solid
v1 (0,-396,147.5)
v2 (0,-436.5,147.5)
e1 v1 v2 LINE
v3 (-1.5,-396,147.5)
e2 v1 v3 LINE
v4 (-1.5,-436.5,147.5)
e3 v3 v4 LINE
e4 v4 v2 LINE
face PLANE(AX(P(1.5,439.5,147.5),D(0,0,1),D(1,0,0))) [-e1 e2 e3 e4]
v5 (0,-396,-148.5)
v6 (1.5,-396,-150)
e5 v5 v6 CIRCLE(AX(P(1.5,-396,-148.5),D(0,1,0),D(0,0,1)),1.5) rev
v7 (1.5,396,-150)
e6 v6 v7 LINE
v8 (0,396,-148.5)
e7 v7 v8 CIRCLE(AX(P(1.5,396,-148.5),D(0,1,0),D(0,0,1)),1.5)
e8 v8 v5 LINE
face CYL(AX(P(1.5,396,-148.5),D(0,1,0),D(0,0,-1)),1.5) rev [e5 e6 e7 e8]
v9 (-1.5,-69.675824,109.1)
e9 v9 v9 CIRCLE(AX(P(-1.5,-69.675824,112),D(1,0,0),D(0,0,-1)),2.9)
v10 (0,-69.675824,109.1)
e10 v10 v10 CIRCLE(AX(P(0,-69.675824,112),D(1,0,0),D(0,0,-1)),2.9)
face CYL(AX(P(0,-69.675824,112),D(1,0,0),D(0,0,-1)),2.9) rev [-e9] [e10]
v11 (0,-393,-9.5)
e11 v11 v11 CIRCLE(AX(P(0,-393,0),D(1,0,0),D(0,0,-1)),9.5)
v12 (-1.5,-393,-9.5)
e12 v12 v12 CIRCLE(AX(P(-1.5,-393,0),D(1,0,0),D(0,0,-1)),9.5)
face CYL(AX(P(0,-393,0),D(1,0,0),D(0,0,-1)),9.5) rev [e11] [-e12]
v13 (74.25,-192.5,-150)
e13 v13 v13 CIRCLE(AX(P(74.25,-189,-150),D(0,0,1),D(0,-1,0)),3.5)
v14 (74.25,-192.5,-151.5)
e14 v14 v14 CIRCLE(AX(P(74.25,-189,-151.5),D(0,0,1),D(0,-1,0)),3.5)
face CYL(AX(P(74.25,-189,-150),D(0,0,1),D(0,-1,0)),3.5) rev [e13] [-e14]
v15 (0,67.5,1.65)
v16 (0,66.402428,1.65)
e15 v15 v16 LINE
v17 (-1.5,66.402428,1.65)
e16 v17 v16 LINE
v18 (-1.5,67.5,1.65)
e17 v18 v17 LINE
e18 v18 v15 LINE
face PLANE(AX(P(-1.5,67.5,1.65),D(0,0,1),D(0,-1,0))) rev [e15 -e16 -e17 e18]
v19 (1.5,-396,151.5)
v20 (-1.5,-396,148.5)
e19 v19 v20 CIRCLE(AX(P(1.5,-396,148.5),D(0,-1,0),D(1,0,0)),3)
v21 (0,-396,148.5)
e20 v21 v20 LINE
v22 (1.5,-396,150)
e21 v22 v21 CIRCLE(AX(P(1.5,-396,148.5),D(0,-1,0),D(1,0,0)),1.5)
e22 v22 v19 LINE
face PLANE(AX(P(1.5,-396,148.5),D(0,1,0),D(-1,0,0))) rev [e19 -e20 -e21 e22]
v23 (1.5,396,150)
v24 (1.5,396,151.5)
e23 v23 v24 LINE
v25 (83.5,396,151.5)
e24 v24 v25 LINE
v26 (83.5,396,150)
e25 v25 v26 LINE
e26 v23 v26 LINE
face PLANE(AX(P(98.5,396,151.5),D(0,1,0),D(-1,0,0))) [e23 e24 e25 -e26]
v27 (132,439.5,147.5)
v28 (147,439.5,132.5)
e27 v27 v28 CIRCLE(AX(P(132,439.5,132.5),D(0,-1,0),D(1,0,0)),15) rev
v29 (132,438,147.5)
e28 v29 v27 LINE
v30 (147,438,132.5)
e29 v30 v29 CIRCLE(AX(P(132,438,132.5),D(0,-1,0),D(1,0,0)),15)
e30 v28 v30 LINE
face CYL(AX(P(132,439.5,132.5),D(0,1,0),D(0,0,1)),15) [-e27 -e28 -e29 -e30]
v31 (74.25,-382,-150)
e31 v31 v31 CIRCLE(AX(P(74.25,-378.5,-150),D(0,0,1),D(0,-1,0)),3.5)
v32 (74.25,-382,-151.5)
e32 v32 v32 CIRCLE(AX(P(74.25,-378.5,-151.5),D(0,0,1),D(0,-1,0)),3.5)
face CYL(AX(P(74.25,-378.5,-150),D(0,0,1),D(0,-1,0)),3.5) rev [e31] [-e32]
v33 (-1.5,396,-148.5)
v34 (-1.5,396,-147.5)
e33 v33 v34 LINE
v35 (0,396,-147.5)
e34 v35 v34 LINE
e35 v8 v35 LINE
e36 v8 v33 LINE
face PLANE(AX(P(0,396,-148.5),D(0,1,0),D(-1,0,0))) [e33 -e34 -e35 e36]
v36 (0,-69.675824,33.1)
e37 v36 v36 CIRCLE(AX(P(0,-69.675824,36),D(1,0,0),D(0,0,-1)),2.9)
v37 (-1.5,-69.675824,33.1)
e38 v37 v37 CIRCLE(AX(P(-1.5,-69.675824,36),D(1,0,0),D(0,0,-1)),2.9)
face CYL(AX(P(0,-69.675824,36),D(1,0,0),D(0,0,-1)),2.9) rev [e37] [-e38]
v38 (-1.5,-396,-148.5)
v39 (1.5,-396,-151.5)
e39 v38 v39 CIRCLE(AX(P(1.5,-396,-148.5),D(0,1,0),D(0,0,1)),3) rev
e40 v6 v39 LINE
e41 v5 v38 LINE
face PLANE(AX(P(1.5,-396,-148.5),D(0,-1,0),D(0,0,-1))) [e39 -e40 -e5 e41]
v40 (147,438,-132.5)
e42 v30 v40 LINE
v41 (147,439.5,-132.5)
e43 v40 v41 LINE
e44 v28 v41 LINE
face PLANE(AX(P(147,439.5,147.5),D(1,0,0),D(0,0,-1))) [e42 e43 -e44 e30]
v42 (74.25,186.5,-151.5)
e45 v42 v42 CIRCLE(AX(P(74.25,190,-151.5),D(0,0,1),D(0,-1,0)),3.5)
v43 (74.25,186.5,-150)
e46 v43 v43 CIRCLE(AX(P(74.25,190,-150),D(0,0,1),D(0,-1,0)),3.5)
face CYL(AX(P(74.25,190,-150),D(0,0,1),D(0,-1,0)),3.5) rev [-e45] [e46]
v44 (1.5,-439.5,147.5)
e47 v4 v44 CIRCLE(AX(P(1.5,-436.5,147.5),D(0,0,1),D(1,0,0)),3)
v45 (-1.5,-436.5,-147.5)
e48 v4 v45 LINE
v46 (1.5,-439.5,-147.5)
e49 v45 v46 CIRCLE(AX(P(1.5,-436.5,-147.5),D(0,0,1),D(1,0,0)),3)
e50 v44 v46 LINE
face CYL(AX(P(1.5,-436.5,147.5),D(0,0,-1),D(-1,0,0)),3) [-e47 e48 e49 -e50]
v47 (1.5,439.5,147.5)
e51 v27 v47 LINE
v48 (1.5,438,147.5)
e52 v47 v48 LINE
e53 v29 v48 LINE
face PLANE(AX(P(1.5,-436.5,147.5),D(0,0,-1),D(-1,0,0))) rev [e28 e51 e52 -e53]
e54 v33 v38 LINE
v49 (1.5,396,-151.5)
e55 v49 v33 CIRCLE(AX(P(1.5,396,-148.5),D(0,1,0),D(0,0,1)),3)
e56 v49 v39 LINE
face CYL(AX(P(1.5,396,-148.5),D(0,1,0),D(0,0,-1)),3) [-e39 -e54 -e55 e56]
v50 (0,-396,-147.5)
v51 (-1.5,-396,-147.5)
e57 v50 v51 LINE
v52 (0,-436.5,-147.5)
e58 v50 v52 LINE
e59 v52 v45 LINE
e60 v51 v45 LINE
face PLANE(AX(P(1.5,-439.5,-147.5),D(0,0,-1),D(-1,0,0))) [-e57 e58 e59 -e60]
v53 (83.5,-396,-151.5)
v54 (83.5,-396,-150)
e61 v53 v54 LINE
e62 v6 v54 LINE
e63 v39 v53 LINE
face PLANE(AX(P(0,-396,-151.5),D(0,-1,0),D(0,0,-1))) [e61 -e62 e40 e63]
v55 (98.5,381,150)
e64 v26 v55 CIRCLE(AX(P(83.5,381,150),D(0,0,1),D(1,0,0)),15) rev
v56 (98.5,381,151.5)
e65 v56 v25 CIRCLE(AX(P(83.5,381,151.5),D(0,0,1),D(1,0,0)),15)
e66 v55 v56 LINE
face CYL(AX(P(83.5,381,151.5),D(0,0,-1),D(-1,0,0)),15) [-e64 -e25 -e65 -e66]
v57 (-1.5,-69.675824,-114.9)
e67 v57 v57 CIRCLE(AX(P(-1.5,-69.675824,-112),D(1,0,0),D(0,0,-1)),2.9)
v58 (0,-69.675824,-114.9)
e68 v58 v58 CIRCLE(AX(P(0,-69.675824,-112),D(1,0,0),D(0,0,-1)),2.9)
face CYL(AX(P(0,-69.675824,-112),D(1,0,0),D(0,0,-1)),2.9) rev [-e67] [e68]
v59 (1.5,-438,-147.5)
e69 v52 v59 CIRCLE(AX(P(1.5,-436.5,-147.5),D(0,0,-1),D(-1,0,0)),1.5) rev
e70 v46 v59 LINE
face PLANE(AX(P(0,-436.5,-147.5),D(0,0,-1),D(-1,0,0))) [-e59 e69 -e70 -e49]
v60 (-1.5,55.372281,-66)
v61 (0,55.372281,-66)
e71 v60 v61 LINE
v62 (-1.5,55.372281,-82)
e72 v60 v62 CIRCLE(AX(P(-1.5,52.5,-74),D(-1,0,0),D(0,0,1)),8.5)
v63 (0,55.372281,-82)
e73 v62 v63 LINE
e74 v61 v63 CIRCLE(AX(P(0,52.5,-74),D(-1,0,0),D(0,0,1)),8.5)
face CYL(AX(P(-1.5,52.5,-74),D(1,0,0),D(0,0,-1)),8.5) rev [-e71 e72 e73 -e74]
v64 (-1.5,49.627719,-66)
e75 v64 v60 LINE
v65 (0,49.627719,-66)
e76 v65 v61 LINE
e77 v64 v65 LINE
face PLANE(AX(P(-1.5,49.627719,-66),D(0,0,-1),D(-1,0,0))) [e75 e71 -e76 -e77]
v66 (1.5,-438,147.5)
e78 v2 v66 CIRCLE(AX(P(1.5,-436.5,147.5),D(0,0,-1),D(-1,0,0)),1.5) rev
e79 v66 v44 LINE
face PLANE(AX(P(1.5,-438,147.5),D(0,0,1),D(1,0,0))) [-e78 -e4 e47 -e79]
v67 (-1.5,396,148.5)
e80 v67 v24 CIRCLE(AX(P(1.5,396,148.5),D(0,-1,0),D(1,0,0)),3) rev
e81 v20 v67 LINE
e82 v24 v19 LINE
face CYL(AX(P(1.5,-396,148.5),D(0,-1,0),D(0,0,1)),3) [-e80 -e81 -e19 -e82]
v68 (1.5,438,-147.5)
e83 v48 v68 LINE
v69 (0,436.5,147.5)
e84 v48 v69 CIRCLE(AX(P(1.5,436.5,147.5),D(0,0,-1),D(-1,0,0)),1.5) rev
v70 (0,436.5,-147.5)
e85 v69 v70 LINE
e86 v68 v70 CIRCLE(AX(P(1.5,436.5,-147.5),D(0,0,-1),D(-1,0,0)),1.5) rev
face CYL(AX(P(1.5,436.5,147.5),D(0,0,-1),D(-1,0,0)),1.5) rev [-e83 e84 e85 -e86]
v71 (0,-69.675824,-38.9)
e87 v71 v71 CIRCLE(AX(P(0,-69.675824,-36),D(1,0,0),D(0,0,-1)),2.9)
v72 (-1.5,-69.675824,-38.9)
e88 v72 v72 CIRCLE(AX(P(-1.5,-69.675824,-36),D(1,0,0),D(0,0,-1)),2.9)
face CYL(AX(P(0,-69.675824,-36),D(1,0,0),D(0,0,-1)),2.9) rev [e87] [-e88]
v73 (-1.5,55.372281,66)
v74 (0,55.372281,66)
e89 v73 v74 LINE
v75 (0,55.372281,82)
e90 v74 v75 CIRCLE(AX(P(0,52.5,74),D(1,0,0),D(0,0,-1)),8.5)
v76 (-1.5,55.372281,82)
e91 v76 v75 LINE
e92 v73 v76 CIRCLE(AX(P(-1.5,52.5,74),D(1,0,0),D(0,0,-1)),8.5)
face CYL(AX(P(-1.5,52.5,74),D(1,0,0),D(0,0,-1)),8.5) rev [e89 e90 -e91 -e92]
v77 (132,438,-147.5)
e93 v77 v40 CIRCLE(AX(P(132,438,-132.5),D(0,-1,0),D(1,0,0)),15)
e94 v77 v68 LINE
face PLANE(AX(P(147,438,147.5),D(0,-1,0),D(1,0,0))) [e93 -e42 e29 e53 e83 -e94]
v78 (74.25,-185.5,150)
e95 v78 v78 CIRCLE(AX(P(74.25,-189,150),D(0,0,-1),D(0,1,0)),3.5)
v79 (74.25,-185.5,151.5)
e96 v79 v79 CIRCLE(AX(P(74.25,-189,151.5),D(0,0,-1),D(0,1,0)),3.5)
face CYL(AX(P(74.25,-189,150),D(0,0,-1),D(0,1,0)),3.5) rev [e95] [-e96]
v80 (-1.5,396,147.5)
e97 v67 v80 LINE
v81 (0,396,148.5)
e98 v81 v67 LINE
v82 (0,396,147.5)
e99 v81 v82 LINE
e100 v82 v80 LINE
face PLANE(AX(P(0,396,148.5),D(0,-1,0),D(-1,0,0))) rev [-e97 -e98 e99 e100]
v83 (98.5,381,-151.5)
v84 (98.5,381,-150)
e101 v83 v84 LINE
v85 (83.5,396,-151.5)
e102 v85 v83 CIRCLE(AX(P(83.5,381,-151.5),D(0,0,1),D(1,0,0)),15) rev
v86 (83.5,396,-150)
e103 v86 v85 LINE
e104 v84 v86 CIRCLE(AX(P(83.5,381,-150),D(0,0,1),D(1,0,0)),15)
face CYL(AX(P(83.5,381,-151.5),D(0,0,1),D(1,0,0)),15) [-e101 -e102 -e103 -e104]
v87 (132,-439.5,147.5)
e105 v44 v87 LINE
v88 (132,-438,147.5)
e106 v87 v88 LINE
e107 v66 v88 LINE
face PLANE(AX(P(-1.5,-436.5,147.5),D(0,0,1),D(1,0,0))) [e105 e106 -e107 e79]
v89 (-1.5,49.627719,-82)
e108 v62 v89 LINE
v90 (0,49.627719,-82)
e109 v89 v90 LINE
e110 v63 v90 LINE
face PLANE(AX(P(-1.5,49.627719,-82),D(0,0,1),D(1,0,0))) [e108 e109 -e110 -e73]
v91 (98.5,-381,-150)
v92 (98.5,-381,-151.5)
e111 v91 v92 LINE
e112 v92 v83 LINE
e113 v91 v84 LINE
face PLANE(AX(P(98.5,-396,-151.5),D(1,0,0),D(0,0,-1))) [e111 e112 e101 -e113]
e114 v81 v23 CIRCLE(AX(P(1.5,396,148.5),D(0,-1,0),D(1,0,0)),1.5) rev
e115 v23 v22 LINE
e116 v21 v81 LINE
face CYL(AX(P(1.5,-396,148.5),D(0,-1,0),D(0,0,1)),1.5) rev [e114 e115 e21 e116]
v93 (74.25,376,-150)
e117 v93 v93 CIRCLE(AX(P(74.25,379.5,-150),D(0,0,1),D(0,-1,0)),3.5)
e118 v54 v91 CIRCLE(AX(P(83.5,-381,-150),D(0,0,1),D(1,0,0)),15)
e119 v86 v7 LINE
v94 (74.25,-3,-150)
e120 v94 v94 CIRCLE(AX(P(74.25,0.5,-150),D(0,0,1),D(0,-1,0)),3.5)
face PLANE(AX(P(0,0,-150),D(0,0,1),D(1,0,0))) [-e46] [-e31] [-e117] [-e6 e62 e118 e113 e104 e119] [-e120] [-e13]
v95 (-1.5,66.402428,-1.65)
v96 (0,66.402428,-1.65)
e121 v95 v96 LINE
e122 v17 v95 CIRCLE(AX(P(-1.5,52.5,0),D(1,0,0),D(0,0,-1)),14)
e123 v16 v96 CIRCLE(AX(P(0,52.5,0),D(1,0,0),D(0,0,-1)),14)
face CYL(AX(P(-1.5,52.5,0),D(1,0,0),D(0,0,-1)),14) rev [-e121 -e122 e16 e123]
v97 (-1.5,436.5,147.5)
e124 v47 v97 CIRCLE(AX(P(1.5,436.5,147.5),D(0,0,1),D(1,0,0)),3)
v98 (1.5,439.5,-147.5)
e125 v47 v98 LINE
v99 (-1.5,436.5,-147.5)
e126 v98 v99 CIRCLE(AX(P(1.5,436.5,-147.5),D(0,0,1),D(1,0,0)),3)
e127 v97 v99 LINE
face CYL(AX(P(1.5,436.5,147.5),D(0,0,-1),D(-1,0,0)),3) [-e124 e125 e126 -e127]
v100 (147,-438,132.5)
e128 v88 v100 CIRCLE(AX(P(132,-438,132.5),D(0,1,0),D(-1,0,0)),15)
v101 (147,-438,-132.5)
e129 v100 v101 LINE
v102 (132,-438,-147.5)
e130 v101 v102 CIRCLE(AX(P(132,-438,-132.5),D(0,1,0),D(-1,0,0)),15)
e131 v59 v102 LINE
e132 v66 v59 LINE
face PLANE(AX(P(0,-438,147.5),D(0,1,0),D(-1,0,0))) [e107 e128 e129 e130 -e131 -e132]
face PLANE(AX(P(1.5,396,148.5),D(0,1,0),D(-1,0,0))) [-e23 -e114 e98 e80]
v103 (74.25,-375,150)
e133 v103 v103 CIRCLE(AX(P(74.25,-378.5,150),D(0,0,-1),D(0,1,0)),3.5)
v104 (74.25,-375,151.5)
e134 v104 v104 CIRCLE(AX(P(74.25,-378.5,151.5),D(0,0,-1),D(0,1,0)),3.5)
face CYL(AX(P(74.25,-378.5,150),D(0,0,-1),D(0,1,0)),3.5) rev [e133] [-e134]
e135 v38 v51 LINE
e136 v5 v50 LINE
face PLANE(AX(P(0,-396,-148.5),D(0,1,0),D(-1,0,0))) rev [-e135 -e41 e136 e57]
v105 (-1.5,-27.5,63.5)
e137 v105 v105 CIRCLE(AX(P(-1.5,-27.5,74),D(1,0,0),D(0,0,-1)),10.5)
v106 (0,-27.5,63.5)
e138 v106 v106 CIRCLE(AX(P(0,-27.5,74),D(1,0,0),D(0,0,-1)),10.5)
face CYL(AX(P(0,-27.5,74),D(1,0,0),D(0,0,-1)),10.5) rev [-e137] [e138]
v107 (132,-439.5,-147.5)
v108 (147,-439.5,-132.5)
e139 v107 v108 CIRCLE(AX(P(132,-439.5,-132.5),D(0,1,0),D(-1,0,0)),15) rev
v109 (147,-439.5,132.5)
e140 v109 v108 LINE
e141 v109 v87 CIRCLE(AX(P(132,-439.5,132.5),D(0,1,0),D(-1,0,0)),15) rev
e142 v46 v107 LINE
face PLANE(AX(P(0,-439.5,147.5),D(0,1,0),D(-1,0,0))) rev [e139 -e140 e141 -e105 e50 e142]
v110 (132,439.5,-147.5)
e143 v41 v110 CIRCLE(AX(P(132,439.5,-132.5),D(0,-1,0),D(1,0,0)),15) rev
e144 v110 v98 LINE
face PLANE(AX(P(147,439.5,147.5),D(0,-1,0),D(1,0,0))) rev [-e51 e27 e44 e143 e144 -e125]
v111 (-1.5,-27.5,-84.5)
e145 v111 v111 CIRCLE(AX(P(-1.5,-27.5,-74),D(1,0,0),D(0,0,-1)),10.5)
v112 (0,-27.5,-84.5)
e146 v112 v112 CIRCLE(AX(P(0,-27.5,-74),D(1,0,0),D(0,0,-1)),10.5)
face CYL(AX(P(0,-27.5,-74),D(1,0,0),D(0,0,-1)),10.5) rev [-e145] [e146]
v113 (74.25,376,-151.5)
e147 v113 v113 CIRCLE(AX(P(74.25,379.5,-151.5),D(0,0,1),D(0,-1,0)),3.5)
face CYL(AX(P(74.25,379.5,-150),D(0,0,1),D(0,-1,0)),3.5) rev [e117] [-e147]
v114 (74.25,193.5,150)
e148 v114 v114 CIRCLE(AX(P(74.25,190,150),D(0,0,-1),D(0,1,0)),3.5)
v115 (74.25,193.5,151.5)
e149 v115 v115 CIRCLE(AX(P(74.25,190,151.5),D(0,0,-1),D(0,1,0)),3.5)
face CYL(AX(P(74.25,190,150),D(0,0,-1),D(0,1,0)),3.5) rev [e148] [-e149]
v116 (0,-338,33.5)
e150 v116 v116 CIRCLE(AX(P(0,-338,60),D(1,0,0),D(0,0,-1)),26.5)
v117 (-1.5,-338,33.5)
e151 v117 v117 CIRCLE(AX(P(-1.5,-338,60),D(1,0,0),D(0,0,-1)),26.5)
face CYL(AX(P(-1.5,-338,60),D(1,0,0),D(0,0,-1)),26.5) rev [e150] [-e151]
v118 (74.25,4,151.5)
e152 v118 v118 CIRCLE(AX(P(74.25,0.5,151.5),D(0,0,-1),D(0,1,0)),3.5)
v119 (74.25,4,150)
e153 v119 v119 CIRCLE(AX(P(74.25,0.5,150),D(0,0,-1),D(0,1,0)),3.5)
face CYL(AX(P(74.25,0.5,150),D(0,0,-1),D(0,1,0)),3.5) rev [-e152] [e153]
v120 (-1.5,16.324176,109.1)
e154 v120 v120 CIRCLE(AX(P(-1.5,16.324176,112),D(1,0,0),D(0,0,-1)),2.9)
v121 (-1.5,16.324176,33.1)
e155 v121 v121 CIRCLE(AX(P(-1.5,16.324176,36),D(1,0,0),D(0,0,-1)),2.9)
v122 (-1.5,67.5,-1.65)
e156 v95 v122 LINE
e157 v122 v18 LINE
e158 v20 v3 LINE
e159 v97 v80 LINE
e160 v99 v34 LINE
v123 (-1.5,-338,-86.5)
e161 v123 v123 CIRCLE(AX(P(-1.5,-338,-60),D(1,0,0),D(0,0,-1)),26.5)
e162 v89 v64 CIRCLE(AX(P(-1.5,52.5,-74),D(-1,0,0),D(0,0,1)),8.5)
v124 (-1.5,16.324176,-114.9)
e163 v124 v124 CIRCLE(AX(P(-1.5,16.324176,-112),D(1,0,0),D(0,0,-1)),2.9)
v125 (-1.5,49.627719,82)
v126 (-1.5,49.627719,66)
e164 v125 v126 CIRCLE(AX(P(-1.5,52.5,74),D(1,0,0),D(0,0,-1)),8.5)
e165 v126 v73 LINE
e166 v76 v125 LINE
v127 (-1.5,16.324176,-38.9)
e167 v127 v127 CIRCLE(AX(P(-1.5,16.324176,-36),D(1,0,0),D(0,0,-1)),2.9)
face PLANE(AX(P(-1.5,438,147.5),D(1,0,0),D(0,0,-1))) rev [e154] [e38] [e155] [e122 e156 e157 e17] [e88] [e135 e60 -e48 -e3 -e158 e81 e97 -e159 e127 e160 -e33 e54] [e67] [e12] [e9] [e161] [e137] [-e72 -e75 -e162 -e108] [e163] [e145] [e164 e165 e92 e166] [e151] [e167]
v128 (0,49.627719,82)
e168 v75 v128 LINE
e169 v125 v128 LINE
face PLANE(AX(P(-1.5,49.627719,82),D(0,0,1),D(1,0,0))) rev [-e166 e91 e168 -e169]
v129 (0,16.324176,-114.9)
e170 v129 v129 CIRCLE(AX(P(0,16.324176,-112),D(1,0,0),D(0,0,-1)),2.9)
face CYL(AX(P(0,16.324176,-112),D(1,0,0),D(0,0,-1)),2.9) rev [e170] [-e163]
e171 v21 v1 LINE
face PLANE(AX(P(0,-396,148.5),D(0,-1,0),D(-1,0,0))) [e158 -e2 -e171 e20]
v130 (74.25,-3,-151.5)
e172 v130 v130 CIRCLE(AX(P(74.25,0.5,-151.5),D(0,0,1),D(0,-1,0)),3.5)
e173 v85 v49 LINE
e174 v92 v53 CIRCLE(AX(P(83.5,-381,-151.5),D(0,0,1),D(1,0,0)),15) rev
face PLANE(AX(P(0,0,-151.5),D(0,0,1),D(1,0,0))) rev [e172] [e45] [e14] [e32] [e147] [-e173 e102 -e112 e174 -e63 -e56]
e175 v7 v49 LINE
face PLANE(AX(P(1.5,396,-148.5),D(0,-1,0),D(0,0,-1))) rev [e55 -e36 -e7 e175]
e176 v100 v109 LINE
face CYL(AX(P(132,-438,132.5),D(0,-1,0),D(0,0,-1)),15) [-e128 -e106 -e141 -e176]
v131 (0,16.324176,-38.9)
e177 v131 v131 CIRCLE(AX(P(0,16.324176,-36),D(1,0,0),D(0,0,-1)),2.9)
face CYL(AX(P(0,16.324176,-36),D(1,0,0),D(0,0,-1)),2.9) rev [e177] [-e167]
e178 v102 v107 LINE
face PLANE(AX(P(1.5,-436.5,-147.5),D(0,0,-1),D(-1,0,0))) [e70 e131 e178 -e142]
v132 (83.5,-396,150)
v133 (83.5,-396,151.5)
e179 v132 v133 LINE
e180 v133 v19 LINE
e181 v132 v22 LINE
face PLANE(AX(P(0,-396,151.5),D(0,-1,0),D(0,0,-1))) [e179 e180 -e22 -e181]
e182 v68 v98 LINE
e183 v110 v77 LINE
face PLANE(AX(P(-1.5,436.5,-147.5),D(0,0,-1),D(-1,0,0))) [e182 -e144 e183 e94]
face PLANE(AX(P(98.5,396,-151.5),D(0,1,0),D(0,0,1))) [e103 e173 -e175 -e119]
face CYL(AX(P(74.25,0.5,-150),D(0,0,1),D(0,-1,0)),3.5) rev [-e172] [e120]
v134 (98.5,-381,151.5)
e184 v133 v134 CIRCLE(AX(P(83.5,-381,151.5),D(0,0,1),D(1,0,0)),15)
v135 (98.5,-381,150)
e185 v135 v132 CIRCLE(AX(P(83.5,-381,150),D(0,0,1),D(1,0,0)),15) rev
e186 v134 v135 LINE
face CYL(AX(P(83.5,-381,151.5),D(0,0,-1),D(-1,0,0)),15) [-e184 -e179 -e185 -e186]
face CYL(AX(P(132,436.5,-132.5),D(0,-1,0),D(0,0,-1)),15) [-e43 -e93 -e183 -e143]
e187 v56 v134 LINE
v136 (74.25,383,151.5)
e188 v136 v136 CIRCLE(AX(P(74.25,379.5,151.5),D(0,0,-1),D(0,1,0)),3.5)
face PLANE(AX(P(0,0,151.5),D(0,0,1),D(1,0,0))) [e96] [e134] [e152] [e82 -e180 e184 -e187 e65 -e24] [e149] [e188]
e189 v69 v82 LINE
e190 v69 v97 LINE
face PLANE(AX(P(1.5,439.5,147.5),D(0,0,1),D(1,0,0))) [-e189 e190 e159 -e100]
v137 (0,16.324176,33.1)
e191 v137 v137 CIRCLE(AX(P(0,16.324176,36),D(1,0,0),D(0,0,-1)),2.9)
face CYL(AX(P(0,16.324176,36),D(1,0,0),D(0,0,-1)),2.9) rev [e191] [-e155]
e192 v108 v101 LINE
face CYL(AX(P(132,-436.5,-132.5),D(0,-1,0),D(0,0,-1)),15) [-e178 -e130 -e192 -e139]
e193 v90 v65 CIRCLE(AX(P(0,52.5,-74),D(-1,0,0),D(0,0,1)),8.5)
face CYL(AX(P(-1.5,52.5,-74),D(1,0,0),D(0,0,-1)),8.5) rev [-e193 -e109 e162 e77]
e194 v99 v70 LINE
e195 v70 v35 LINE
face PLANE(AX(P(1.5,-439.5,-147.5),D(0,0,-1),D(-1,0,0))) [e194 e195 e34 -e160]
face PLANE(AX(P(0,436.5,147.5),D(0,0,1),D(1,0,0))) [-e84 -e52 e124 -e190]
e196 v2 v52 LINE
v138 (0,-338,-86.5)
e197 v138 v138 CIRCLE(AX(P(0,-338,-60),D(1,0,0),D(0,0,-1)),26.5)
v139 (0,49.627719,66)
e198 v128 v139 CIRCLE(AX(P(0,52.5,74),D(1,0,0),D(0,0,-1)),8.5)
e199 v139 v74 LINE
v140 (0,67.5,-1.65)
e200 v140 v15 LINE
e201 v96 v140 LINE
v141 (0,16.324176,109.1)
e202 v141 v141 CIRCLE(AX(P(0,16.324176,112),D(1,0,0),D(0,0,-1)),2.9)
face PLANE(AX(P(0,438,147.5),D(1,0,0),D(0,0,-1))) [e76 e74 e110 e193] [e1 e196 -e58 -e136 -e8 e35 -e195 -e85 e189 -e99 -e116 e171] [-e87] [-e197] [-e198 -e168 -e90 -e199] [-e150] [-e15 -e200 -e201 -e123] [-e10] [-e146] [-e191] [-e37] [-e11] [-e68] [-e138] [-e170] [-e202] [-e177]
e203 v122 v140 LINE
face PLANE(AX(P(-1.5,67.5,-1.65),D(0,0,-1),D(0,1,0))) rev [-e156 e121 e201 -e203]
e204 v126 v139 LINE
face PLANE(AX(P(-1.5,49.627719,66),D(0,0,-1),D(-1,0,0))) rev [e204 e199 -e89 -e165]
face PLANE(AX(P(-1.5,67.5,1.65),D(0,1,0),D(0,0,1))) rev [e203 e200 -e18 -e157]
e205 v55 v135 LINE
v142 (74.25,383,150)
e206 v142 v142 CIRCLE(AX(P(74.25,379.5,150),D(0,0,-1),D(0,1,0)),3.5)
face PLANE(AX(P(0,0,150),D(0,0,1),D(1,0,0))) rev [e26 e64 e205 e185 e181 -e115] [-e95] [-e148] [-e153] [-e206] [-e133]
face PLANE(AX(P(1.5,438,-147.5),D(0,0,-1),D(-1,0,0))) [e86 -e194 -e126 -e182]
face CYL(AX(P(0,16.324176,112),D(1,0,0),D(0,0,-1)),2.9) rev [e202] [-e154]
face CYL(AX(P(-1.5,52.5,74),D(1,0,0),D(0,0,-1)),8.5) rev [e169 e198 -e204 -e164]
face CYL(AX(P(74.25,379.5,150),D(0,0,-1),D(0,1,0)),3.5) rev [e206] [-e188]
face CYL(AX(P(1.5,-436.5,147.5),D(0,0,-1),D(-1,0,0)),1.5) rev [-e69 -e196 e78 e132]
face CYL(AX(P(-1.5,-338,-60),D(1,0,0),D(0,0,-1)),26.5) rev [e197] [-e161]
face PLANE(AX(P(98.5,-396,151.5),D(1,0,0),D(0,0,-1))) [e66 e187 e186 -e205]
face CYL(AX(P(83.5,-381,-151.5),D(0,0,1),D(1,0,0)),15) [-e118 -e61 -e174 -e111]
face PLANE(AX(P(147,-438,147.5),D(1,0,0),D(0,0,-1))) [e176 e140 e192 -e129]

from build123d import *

# Parameters (mm, degrees)
BASE_FLANGE1_DEPTH           = 147.5
EDGE_FLANGE1_DEPTH           = 792
EDGE_FLANGE1_BEND_DEPTH      = 792
F_7_0_7_DIAMETER_HOLE1_D     = 7
F_7_0_7_DIAMETER_HOLE1_DEPTH = 1.5
FILLET1_R                    = 15
SKETCH14_R                   = 26.5
CUT_EXTRUDE1_DEPTH           = 488.566918484
M16_CLEARANCE_HOLE1_D        = 19
M5_CLEARANCE_HOLE1_D         = 5.8
M20_CLEARANCE_HOLE1_D        = 21
CUT_EXTRUDE2_DEPTH           = 488.566918484
CUT_EXTRUDE3_DEPTH           = 488.566918484


# Sheet-metal steps are written as plain solids
with BuildPart() as part:
    # Sketch1 → Base-Flange1 (new, symmetric)
    with BuildSketch(Plane.XY):
        with BuildLine():
            Line((147, 438), (1.5, 438))
            ThreePointArc((1.5, 438), (0.439339828, 437.560660172), (0, 436.5))
            Line((0, 436.5), (0, -436.5))
            ThreePointArc((0, -436.5), (0.439339828, -437.560660172), (1.5, -438))
            Line((1.5, -438), (147, -438))
            Line((147, -438), (147, -439.5))
            Line((147, -439.5), (1.5, -439.5))
            ThreePointArc((1.5, -439.5), (-0.621320344, -438.621320344), (-1.5, -436.5))
            Line((-1.5, -436.5), (-1.5, 436.5))
            ThreePointArc((-1.5, 436.5), (-0.621320344, 438.621320344), (1.5, 439.5))
            Line((1.5, 439.5), (147, 439.5))
            Line((147, 439.5), (147, 438))
        make_face()
    extrude(amount=BASE_FLANGE1_DEPTH, both=True)

    # Edge-Flange1 section (across the edge) → Edge-Flange1 (add)
    with BuildSketch(Plane(origin=(0, 396, 150), x_dir=(0, 0, -1), z_dir=(0, -1, 0))):
        with BuildLine():
            Line((-1.5, 1.5), (-1.5, 98.5))
            Line((-1.5, 98.5), (0, 98.5))
            Line((0, 98.5), (0, 1.5))
            ThreePointArc((0, 1.5), (0.439339828, 0.439339828), (1.5, 0))
            Line((1.5, 0), (2.5, 0))
            Line((2.5, 0), (2.5, -1.5))
            Line((2.5, -1.5), (1.5, -1.5))
            ThreePointArc((1.5, -1.5), (-0.621320344, -0.621320344), (-1.5, 1.5))
        make_face()
    extrude(amount=EDGE_FLANGE1_DEPTH)

    # Edge-Flange1 section 2 (across the edge) → Edge-Flange1 bend (add)
    with BuildSketch(Plane(origin=(0, -396, -150), x_dir=(0, 0, 1), z_dir=(0, 1, 0))):
        with BuildLine():
            Line((-1.5, 1.5), (-1.5, 98.5))
            Line((-1.5, 98.5), (0, 98.5))
            Line((0, 98.5), (0, 1.5))
            ThreePointArc((0, 1.5), (0.439339828, 0.439339828), (1.5, 0))
            Line((1.5, 0), (2.5, 0))
            Line((2.5, 0), (2.5, -1.5))
            Line((2.5, -1.5), (1.5, -1.5))
            ThreePointArc((1.5, -1.5), (-0.621320344, -0.621320344), (-1.5, 1.5))
        make_face()
    extrude(amount=EDGE_FLANGE1_BEND_DEPTH)

    # Ø7.0 (7) Diameter Hole1
    with Locations(Plane(origin=(0, 0, 150), x_dir=(-1, 0, 0), z_dir=(0, 0, -1))):
        with Locations((-74.25, 379.5), (-74.25, 190), (-74.25, 0.5), (-74.25, -189), (-74.25, -378.5)):
            f_7_0_7_diameter_hole1 = Hole(F_7_0_7_DIAMETER_HOLE1_D / 2, depth=F_7_0_7_DIAMETER_HOLE1_DEPTH)

    # Mirror1: Ø7.0 (7) Diameter Hole1 across plane
    add(f_7_0_7_diameter_hole1.mirror(Plane.XY), mode=Mode.SUBTRACT)

    # Fillet1
    fillet1_edges = [part.edges().sort_by_distance(p)[0] for p in [
        (147, 438.75, -147.5),
        (147, -438.75, -147.5),
        (147, 438.75, 147.5),
        (98.5, 396, 150.75),
        (98.5, -396, 150.75),
        (98.5, -396, -150.75),
        (98.5, 396, -150.75),
        (147, -438.75, 147.5),
    ]]
    fillet(fillet1_edges, radius=FILLET1_R)

    # Sketch14 → Cut-Extrude1 (cut, through all)
    with BuildSketch(Plane(origin=(0, 0, 0), x_dir=(0, 0, -1), z_dir=(1, 0, 0))):
        with Locations((-60, -338)):
            Circle(SKETCH14_R)
        with Locations((60, -338)):
            Circle(SKETCH14_R)
    extrude(amount=-CUT_EXTRUDE1_DEPTH, mode=Mode.SUBTRACT)

    # M16 Clearance Hole1 (through all)
    with Locations(Plane(origin=(0, 0, 0), x_dir=(0, 0, -1), z_dir=(1, 0, 0))):
        with Locations((0, -393)):
            Hole(M16_CLEARANCE_HOLE1_D / 2)

    # M5 Clearance Hole1 (through all)
    with Locations(Plane(origin=(0, 0, 0), x_dir=(0, 0, -1), z_dir=(1, 0, 0))):
        with Locations((-112, 16.324175824), (-36, -69.675824176), (-112, -69.675824176), (-36, 16.324175824)):
            m5_clearance_hole1 = Hole(M5_CLEARANCE_HOLE1_D / 2)

    # Mirror2: M5 Clearance Hole1 across plane
    add(m5_clearance_hole1.mirror(Plane.XY), mode=Mode.SUBTRACT)

    # M20 Clearance Hole1 (through all)
    with Locations(Plane(origin=(0, 0, 0), x_dir=(0, 0, -1), z_dir=(1, 0, 0))):
        with Locations((-74, -27.5), (74, -27.5)):
            Hole(M20_CLEARANCE_HOLE1_D / 2)

    # Sketch22 → Cut-Extrude2 (cut, through all)
    with BuildSketch(Plane(origin=(0, 0, 0), x_dir=(0, 0, -1), z_dir=(1, 0, 0))):
        with BuildLine():
            Line((-82, 49.627718677), (-82, 55.372281323))
            ThreePointArc((-82, 55.372281323), (-74, 61), (-66, 55.372281323))
            Line((-66, 55.372281323), (-66, 49.627718677))
            ThreePointArc((-66, 49.627718677), (-74, 44), (-82, 49.627718677))
        make_face()
    cut_extrude2 = extrude(amount=-CUT_EXTRUDE2_DEPTH, mode=Mode.SUBTRACT)

    # Mirror3: Cut-Extrude2 across plane
    add(cut_extrude2.mirror(Plane.XY), mode=Mode.SUBTRACT)

    # Sketch23 → Cut-Extrude3 (cut, through all)
    with BuildSketch(Plane(origin=(0, 0, 0), x_dir=(0, 0, -1), z_dir=(1, 0, 0))):
        with BuildLine():
            Line((-1.65, 67.5), (-1.65, 66.402427846))
            ThreePointArc((-1.65, 66.402427846), (0, 38.5), (1.65, 66.402427846))
            Line((1.65, 66.402427846), (1.65, 67.5))
            Line((1.65, 67.5), (-1.65, 67.5))
        make_face()
    extrude(amount=-CUT_EXTRUDE3_DEPTH, mode=Mode.SUBTRACT)


solid = part.part
